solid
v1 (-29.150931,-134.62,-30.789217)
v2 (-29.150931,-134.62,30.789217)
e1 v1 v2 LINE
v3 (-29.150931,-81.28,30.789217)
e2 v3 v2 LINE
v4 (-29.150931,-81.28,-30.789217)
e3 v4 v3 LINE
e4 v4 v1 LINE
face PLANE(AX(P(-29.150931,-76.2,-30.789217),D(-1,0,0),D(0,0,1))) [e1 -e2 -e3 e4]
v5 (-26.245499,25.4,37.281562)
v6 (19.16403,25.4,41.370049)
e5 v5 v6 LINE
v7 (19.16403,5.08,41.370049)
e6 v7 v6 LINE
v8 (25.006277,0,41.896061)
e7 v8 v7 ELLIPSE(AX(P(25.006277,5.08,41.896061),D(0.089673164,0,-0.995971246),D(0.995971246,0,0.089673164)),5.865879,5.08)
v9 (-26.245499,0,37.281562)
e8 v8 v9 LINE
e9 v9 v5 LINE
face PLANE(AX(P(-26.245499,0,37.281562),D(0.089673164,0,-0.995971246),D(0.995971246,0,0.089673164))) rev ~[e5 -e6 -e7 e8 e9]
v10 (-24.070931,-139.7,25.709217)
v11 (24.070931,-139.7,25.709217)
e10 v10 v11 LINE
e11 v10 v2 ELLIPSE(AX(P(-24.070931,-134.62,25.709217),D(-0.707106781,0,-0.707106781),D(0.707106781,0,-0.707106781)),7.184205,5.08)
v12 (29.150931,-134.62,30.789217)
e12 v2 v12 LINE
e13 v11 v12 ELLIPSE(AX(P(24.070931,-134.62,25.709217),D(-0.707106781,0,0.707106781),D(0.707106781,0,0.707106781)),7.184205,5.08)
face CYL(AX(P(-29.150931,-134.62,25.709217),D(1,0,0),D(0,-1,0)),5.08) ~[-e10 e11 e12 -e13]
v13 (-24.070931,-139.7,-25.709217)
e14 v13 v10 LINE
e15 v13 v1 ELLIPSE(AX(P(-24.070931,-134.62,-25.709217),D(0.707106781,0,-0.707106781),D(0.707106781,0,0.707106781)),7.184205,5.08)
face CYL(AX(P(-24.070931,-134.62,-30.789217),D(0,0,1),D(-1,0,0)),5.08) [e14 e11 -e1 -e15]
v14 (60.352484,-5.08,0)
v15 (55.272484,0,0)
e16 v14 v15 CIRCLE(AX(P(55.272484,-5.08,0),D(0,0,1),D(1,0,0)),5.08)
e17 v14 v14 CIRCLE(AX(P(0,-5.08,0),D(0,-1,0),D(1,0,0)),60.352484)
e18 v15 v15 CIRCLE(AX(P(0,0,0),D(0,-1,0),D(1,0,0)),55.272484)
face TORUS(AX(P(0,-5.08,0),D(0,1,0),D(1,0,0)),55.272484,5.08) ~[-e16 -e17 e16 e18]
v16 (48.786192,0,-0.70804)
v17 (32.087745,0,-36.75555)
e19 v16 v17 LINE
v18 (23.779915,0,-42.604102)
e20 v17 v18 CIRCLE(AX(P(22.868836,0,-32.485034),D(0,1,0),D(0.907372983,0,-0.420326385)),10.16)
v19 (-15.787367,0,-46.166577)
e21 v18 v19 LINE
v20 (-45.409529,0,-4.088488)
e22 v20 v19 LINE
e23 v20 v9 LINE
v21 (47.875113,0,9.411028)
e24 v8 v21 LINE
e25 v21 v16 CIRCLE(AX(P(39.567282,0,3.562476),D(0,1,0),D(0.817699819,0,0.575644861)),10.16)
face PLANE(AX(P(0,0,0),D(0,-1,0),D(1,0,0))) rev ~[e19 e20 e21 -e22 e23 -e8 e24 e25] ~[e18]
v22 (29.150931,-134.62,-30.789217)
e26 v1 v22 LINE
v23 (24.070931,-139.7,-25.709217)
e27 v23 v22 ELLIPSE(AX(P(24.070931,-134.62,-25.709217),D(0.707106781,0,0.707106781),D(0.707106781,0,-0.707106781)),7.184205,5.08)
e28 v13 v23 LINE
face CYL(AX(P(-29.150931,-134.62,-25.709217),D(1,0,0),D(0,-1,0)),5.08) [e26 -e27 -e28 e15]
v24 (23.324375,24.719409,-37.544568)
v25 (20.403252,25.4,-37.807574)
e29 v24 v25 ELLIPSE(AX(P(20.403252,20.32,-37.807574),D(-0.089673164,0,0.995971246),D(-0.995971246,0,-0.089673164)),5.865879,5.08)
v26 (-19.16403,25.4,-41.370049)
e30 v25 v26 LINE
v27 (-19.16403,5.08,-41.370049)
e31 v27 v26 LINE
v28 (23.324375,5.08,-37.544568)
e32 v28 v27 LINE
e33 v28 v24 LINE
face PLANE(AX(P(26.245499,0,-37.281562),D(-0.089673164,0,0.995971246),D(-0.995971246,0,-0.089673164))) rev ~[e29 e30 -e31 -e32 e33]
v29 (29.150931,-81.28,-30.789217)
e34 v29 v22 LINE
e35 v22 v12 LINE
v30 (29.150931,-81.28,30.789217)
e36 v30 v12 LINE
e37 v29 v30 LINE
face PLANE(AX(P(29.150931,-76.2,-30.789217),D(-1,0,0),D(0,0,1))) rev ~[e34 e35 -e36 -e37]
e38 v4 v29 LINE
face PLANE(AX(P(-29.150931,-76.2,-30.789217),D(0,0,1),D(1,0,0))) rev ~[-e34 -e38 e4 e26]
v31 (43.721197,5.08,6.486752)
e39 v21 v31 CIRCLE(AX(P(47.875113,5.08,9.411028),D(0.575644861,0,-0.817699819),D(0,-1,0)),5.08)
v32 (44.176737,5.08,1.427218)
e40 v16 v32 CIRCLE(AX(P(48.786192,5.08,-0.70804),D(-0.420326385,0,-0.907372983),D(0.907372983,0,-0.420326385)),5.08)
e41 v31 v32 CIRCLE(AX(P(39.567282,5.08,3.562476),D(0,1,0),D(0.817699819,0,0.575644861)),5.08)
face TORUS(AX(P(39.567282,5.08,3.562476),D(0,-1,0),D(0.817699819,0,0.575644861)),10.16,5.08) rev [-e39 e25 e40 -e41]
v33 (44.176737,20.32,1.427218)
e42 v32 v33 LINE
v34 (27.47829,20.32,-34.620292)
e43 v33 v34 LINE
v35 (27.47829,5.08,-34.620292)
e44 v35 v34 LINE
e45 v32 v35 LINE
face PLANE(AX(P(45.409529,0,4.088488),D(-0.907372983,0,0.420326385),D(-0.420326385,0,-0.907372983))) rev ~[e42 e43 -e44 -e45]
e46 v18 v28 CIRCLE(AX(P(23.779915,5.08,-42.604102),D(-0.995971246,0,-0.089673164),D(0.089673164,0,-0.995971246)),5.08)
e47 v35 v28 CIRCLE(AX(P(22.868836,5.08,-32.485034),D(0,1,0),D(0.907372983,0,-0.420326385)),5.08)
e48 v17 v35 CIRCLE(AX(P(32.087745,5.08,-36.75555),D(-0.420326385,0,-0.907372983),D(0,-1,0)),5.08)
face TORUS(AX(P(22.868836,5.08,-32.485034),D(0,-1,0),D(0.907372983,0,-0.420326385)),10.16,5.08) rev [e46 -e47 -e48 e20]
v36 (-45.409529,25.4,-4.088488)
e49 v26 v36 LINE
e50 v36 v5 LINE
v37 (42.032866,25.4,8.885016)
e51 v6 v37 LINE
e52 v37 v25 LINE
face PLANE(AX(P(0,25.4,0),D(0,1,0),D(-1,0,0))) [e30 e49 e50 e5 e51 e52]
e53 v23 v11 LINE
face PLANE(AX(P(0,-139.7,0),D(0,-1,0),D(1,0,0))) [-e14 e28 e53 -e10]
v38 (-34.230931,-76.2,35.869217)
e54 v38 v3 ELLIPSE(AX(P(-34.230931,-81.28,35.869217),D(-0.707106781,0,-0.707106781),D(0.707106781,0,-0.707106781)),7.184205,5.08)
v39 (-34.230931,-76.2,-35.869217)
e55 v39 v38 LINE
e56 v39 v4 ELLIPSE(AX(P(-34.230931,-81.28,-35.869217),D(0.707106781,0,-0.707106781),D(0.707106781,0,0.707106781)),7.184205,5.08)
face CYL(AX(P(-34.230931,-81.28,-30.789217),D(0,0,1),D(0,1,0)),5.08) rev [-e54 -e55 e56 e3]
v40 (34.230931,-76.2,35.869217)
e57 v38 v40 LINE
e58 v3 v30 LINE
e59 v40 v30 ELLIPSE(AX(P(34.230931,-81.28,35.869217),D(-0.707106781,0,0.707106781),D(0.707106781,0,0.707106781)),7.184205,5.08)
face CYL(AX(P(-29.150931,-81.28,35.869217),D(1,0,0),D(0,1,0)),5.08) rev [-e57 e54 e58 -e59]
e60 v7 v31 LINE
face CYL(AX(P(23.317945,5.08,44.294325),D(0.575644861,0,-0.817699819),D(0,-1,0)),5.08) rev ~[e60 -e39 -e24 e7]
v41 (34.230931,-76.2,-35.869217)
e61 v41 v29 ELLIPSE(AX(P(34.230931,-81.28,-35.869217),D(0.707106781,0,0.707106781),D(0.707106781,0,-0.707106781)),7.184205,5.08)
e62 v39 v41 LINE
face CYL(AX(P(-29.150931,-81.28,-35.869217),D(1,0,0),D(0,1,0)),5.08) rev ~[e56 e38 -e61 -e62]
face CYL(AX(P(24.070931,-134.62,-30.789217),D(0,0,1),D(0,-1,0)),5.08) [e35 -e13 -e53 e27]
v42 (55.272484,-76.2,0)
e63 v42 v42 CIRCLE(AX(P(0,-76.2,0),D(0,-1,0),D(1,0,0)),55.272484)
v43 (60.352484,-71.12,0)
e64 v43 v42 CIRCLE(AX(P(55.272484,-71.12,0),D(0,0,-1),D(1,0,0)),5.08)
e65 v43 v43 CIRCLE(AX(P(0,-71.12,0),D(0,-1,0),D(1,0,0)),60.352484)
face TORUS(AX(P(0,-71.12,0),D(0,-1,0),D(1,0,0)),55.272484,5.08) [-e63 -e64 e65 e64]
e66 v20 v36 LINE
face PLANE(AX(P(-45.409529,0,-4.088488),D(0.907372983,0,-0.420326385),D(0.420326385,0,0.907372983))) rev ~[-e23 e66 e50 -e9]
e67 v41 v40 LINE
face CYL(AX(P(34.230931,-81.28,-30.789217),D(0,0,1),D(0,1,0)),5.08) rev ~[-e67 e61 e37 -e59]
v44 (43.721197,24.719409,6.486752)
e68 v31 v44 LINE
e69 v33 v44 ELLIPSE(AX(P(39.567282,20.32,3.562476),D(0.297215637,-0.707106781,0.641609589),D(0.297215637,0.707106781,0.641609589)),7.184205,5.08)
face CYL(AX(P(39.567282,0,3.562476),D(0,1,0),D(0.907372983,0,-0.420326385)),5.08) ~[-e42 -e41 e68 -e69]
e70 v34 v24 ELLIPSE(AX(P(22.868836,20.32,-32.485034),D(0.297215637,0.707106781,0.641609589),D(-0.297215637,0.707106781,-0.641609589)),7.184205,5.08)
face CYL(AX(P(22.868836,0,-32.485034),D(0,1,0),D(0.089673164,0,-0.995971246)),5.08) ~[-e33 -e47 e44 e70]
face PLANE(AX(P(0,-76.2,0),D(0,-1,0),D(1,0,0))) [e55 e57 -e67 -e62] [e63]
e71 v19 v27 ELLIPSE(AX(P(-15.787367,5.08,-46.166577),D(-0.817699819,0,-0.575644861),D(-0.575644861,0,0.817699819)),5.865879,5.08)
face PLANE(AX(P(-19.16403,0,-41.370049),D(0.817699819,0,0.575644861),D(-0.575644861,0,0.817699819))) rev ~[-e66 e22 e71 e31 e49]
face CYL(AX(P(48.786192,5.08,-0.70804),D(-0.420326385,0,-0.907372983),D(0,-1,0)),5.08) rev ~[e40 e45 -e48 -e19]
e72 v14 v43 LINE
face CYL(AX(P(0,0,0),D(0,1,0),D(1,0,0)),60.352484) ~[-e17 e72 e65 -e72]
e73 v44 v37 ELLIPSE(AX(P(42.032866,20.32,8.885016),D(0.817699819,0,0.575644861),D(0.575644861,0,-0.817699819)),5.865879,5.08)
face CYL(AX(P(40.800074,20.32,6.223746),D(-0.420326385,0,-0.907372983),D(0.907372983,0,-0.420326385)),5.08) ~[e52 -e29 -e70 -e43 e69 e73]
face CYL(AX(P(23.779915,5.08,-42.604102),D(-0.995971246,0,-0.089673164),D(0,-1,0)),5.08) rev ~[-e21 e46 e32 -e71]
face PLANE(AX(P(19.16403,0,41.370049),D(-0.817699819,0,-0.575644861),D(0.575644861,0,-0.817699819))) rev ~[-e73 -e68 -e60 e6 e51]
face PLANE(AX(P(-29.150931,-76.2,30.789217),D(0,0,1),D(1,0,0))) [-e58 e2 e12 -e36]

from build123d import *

# Parameters (mm, degrees)
F0_R     = 60.3524841782
F1_DEPTH = 76.2
F3_W     = 58.3018623292
F3_H     = 61.5784339607
F4_DEPTH = 63.5
F7_DEPTH = 25.4
F8_F1_R  = 5.08
F8_F2_R  = 5.08
F9_R     = 5.08
F10_R    = 5.08


with BuildPart() as f1:
    # F0 (on Front) → F1 (new body)
    with BuildSketch(Plane.XZ):
        Circle(F0_R)
    extrude(amount=F1_DEPTH)

    # F3 (on face) → F4 (join)
    with BuildSketch(Plane.XZ.offset(76.2)):
        Rectangle(F3_W, F3_H)
    extrude(amount=F4_DEPTH)

    # F6 (on face) → F7 (join)
    with BuildSketch(Plane(origin=(0, 0, 0), x_dir=(-1, 0, 0), z_dir=(0, 1, 0))):
        Polygon((19.1640303054, -41.3700494554), (45.4095289369, -4.0884876443), (26.2454986315, 37.2815618111), (-19.1640303054, 41.3700494554), (-45.4095289369, 4.0884876443), (-26.2454986315, -37.2815618111), align=None)
    extrude(amount=F7_DEPTH)

    # F8: fillet of radius 5.08 on 4 edges, made by hand

    # F8_f1
    f8_f1_edges = [f1.edges().sort_by_distance(p)[0] for p in [
        (45.4095289369, 12.7, 4.0884876443),
        (26.2454986315, 12.7, -37.2815618111),
        (35.8275137842, 25.4, -16.5965370834),
    ]]
    fillet(f8_f1_edges, radius=F8_F1_R)

    # F8_f2
    f8_f2_edges = [f1.edges().sort_by_distance(p)[0] for p in [
        (35.8275137842, 0, -16.5965370834),
        (44.6268163137, 0, 4.0180154116),
        (25.7931115761, 0, -36.6389489119),
    ]]
    fillet(f8_f2_edges, radius=F8_F2_R)

    # F9
    f9_edges = [f1.edges().sort_by_distance(p)[0] for p in [
        (0, -139.7, -30.789217),
        (29.150931, -139.7, 0),
        (0, -139.7, 30.789217),
        (-29.150931, -139.7, 0),
        (-60.352484, -76.2, 0),
        (0, -76.2, -30.789217),
        (29.150931, -76.2, 0),
        (0, -76.2, 30.789217),
        (-29.150931, -76.2, 0),
    ]]
    fillet(f9_edges, radius=F9_R)

    # F10
    f10_edges = [f1.edges().sort_by_distance(p)[0] for p in [
        (-60.352484, 0, 0),
    ]]
    fillet(f10_edges, radius=F10_R)


solid = f1.part
